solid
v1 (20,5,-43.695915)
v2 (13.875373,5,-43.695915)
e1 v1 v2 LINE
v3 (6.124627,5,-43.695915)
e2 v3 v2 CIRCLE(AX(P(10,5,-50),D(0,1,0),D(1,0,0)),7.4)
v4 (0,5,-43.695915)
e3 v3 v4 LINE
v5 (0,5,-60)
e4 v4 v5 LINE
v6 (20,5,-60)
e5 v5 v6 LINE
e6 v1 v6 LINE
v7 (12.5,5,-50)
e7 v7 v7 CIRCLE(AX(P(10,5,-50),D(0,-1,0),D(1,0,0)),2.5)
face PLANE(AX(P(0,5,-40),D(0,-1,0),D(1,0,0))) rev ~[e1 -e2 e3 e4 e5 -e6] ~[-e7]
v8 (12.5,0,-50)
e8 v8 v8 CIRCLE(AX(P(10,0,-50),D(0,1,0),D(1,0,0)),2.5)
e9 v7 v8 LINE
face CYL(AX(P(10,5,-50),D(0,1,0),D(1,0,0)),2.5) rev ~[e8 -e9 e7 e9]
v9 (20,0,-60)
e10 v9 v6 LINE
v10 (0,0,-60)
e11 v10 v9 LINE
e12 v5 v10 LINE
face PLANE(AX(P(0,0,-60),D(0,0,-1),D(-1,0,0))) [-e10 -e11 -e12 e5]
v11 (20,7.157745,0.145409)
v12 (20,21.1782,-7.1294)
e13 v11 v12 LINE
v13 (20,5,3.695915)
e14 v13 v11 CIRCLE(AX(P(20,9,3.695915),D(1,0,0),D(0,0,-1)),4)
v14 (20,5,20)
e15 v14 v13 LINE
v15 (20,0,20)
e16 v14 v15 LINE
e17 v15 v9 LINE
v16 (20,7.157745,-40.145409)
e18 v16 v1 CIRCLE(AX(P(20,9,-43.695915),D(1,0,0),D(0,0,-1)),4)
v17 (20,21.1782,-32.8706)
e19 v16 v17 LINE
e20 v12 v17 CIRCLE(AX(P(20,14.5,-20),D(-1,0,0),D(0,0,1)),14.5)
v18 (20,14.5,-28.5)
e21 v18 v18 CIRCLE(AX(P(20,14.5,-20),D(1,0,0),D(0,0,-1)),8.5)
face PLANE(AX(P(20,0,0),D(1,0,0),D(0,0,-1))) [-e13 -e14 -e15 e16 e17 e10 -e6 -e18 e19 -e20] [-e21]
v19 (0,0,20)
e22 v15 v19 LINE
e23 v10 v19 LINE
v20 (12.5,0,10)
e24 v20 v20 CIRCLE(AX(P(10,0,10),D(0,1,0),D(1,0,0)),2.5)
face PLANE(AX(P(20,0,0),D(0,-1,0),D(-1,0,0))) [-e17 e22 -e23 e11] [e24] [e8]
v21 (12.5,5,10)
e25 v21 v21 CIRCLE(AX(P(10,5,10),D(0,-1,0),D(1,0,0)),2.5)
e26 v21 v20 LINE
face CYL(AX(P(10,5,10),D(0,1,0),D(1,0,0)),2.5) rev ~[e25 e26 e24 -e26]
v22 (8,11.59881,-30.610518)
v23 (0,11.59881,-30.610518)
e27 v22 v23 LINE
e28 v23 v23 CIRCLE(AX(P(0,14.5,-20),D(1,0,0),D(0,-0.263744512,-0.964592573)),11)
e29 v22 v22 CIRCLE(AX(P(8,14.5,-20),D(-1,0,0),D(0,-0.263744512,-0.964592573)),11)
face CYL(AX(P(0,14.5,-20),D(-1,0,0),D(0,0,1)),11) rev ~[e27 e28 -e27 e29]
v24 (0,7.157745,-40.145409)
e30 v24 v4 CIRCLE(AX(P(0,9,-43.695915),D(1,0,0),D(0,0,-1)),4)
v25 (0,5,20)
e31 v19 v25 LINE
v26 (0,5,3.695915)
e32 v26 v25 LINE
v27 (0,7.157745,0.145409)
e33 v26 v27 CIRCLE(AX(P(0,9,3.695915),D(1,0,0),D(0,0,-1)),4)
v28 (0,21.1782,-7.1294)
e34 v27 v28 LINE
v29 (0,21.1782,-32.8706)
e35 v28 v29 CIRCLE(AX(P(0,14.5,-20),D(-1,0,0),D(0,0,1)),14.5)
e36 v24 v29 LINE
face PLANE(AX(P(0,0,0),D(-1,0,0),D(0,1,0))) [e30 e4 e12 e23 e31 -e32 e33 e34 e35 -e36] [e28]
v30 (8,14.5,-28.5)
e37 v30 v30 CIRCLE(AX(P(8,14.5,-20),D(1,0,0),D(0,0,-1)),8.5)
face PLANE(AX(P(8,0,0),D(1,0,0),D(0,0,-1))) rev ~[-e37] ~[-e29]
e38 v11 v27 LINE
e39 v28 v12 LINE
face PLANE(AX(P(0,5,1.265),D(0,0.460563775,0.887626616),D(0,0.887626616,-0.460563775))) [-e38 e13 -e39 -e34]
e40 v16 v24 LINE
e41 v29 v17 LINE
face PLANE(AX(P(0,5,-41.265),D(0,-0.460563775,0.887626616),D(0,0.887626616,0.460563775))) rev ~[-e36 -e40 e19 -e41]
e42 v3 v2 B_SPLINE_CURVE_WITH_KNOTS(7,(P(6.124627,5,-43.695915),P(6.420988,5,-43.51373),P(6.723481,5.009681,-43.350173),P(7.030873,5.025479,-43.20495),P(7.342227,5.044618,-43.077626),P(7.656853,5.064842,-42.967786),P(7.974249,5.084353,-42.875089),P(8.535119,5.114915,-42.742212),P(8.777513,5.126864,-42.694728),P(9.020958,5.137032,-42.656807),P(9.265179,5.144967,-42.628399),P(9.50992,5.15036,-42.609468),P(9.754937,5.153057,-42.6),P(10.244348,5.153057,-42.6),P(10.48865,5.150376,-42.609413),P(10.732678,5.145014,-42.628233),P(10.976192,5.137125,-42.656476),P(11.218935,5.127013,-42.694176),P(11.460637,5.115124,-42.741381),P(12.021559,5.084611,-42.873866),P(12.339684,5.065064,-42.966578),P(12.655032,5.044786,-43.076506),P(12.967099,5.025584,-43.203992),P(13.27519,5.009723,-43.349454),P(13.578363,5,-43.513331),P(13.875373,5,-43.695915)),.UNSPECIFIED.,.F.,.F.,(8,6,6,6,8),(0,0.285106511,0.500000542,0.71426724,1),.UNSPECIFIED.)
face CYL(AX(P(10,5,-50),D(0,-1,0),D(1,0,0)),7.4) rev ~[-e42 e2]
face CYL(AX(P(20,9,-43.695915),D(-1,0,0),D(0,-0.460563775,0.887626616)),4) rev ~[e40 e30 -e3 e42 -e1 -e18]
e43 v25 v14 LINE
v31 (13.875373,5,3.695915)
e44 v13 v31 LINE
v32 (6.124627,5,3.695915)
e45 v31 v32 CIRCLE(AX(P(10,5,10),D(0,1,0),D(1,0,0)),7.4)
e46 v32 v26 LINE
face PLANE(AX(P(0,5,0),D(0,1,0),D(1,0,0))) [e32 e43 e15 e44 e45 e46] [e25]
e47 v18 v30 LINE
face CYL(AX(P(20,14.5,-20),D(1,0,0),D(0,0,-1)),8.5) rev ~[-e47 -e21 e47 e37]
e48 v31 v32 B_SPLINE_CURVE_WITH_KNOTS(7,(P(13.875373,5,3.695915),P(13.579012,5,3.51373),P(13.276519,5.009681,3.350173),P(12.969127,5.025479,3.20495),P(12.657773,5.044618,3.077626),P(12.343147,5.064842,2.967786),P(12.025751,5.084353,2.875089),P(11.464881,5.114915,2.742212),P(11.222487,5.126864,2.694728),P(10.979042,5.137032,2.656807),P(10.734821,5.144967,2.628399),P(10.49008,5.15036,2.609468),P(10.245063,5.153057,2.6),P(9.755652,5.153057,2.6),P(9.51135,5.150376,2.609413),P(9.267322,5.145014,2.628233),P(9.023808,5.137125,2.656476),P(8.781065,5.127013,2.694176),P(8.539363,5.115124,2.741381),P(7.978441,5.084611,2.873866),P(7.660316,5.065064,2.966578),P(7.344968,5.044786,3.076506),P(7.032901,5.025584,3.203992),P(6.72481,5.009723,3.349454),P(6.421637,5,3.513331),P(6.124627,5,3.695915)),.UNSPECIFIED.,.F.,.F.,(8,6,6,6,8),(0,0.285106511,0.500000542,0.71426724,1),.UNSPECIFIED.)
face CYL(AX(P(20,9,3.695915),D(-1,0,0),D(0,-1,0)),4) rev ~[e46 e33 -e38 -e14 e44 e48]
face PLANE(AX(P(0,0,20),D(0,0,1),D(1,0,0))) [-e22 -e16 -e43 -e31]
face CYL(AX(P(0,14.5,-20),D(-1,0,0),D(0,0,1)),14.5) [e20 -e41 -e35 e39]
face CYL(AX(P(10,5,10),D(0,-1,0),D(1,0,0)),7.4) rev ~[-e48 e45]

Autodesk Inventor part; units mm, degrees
ref_plane "YZ Plane" through (0, 0, 0) normal (1, 0, 0) x (0, 1, 0)
ref_plane "XZ Plane" through (0, 0, 0) normal (0, 1, 0) x (-1, 0, 0)
ref_plane "XY Plane" through (0, 0, 0) normal (0, 0, 1) x (1, 0, 0)
sketch "Sketch1" plane through (0, 0, 0) normal (1, 0, 0) x (0, 1, 0)
  line L0 (0, 0) -> (5, 0)
  line L1 (5, 0) -> (5, -40)
  line L2 (5, -40) -> (0, -40)
  line L3 (0, -40) -> (0, 0)
  line L4 (5, -20) -> (10.5, -20)
  circle A0 centre (10.5, -20) radius 4
  line L5 (10.5, -16) -> (5, -16)
  line L6 (10.5, -24) -> (5, -24)
  circle A1 centre (10.5, -20) radius 5.5
  line L7 (14.277, -16.0019) -> (5, -7.2379)
  line L8 (14.2701, -24.0045) -> (5, -32.7321)
  dimension "d0" = 5
  dimension "d1" = 40
  dimension "d2" = 5.5
  dimension "d3" = 8
extrude "Extrusion1" add sketch "Sketch1" along normal blind 20 contours L0 L1 L2 L3 | L7 A1 L5 L1 | L5 A1 L1 | A1 L6 A0 L5 | L1 L6 A1 L8 | A1 L6 L1 | A1 L5 A0 L4 | L4 A0 L6 A1
sketch "Sketch2" plane through (0, 0, -40) normal (0, 0, -1) x (-1, 0, 0)
  line L0 (0, 5) -> (-20, 5) projected
  line L1 (-20, 5) -> (0, 5)
  line L2 (0, 5) -> (0, 0)
  line L3 (0, 0) -> (-20, 0)
  line L4 (-20, 0) -> (-20, 5)
extrude "Extrusion2" add sketch "Sketch2" along normal blind 20
sketch "Sketch3" plane through (0, 0, 0) normal (0, 0, 1) x (1, 0, 0)
  line L0 (0, 5) -> (20, 5) projected
  line L1 (20, 5) -> (20, 0) projected
  line L2 (0, 5) -> (20, 5)
  line L3 (20, 5) -> (20, 0)
  line L4 (20, 0) -> (0, 0)
  line L5 (0, 0) -> (0, 5)
extrude "Extrusion3" add sketch "Sketch3" along normal blind 20
fillet "Fillet1" radius 4 2 edges at (10, 5, -32.7321) (10, 5, -7.2379)
sketch "Sketch4" plane through (0, 5, 20) normal (0, 1, 0) x (1, 0, 0)
  line L0 (0, 80) -> (0, 0) projected
  line L1 (0, 0) -> (10, 0)
  line L2 (0, 0) -> (20, 0) projected
  line L3 (10, 0) -> (10, 10)
  circle A0 centre (10, 10) radius 2.5
  line L4 (0, 80) -> (10, 80)
  line L5 (0, 80) -> (20, 80) projected
  line L6 (10, 80) -> (10, 70)
  circle A1 centre (10, 70) radius 2.5
  point P0 (0, 20)
  dimension "d11" = 10
  dimension "d12" = 10
  dimension "d13" = 5
  dimension "d14" = 10
  dimension "d15" = 5
extrude "Extrusion4" cut sketch "Sketch4" against normal blind 20
sketch "Sketch5" plane through (20, 0, 0) normal (1, 0, 0) x (0, 0, -1)
  circle A0 centre (20, 10.5) radius 4 projected
  circle A1 centre (20, 10.5) radius 7
  line L0 (16, 16.2446) -> (0, 5)
  line L1 (5.5141, 5) -> (-20, 5) projected
  line L2 (34.46, 5) -> (60, 5) projected
  line L3 (20, 17.5) -> (20, 10.5)
  line L4 (24, 16.2446) -> (40, 5)
  line L5 (40, 5) -> (24.3301, 5)
  line L6 (0, 5) -> (15.6699, 5)
  point P0 (0, 0)
  point P1 (40, 5)
  dimension "d18" = 14
extrude "Extrusion5" add sketch "Sketch5" against normal blind 20
fillet "Fillet2" radius 4 2 edges at (10, 5, -40) (10, 5, 0)
sketch "Sketch6" plane through (0, 0, 0) normal (-1, 0, 0) x (0, 0, 1)
  circle A0 centre (-20, 10.5) radius 4 projected
  line L0 (-20, 10.5) -> (-20, 14.5)
  circle A1 centre (-20, 14.5) radius 11
  circle A2 centre (-20, 14.5) radius 14.5
  arc A3 (-41.265, 5) -> (-38.965, 5.7274) centre (-41.265, 9) ccw projected
  line L1 (-41.265, 5) -> (-32.8706, 21.1782)
  line L2 (1.265, 5) -> (20, 5) projected
  line L3 (1.265, 5) -> (-7.1294, 21.1782)
  line L4 (-41.265, 5) -> (-23.6138, 0.4575)
  arc A4 (-1.035, 5.7274) -> (1.265, 5) centre (1.265, 9) ccw projected
  line L5 (-16.3862, 0.4575) -> (1.265, 5)
  point P0 (0, 0)
  dimension "d23" = 4
  dimension "d24" = 22
extrude "Extrusion6" add sketch "Sketch6" against normal blind 20 contours A2 | A2 L3 L5 | A2 L4 L1
sketch "Sketch7" plane through (0, 0, 0) normal (-1, 0, 0) x (0, 0, 1)
  circle A0 centre (-20, 10.5) radius 4 projected
  circle A1 centre (-20, 14.5) radius 11
  point P0 (0, 0)
extrude "Extrusion7" cut sketch "Sketch7" against normal blind 20
fillet "Fillet3" radius 4 2 edges at (10, 5, -41.265) (10, 5, 1.265)
sketch "Sketch8" plane through (0, 5, 20) normal (0, 1, 0) x (1, 0, 0)
  circle A0 centre (10, 10) radius 2.5 projected
  circle A1 centre (10, 10) radius 7.4
  circle A2 centre (10, 70) radius 2.5 projected
  circle A3 centre (10, 70) radius 7.4
  point P0 (0, 20)
  dimension "d30" = 14.8
  dimension "d31" = 14.8
extrude "Extrusion8" cut sketch "Sketch8" along normal blind 10
sketch "Sketch9" plane through (20, 0, 0) normal (1, 0, 0) x (0, 0, -1)
  circle A0 centre (20, 14.5) radius 11 projected
  circle A1 centre (20, 14.5) radius 11
  circle A2 centre (20, 14.5) radius 8.5
  point P0 (0, 0)
  dimension "d34" = 17
extrude "Extrusion9" add sketch "Sketch9" against normal blind 12
properties part number "base_axis_8mm_2020" material "PET Plastic"
